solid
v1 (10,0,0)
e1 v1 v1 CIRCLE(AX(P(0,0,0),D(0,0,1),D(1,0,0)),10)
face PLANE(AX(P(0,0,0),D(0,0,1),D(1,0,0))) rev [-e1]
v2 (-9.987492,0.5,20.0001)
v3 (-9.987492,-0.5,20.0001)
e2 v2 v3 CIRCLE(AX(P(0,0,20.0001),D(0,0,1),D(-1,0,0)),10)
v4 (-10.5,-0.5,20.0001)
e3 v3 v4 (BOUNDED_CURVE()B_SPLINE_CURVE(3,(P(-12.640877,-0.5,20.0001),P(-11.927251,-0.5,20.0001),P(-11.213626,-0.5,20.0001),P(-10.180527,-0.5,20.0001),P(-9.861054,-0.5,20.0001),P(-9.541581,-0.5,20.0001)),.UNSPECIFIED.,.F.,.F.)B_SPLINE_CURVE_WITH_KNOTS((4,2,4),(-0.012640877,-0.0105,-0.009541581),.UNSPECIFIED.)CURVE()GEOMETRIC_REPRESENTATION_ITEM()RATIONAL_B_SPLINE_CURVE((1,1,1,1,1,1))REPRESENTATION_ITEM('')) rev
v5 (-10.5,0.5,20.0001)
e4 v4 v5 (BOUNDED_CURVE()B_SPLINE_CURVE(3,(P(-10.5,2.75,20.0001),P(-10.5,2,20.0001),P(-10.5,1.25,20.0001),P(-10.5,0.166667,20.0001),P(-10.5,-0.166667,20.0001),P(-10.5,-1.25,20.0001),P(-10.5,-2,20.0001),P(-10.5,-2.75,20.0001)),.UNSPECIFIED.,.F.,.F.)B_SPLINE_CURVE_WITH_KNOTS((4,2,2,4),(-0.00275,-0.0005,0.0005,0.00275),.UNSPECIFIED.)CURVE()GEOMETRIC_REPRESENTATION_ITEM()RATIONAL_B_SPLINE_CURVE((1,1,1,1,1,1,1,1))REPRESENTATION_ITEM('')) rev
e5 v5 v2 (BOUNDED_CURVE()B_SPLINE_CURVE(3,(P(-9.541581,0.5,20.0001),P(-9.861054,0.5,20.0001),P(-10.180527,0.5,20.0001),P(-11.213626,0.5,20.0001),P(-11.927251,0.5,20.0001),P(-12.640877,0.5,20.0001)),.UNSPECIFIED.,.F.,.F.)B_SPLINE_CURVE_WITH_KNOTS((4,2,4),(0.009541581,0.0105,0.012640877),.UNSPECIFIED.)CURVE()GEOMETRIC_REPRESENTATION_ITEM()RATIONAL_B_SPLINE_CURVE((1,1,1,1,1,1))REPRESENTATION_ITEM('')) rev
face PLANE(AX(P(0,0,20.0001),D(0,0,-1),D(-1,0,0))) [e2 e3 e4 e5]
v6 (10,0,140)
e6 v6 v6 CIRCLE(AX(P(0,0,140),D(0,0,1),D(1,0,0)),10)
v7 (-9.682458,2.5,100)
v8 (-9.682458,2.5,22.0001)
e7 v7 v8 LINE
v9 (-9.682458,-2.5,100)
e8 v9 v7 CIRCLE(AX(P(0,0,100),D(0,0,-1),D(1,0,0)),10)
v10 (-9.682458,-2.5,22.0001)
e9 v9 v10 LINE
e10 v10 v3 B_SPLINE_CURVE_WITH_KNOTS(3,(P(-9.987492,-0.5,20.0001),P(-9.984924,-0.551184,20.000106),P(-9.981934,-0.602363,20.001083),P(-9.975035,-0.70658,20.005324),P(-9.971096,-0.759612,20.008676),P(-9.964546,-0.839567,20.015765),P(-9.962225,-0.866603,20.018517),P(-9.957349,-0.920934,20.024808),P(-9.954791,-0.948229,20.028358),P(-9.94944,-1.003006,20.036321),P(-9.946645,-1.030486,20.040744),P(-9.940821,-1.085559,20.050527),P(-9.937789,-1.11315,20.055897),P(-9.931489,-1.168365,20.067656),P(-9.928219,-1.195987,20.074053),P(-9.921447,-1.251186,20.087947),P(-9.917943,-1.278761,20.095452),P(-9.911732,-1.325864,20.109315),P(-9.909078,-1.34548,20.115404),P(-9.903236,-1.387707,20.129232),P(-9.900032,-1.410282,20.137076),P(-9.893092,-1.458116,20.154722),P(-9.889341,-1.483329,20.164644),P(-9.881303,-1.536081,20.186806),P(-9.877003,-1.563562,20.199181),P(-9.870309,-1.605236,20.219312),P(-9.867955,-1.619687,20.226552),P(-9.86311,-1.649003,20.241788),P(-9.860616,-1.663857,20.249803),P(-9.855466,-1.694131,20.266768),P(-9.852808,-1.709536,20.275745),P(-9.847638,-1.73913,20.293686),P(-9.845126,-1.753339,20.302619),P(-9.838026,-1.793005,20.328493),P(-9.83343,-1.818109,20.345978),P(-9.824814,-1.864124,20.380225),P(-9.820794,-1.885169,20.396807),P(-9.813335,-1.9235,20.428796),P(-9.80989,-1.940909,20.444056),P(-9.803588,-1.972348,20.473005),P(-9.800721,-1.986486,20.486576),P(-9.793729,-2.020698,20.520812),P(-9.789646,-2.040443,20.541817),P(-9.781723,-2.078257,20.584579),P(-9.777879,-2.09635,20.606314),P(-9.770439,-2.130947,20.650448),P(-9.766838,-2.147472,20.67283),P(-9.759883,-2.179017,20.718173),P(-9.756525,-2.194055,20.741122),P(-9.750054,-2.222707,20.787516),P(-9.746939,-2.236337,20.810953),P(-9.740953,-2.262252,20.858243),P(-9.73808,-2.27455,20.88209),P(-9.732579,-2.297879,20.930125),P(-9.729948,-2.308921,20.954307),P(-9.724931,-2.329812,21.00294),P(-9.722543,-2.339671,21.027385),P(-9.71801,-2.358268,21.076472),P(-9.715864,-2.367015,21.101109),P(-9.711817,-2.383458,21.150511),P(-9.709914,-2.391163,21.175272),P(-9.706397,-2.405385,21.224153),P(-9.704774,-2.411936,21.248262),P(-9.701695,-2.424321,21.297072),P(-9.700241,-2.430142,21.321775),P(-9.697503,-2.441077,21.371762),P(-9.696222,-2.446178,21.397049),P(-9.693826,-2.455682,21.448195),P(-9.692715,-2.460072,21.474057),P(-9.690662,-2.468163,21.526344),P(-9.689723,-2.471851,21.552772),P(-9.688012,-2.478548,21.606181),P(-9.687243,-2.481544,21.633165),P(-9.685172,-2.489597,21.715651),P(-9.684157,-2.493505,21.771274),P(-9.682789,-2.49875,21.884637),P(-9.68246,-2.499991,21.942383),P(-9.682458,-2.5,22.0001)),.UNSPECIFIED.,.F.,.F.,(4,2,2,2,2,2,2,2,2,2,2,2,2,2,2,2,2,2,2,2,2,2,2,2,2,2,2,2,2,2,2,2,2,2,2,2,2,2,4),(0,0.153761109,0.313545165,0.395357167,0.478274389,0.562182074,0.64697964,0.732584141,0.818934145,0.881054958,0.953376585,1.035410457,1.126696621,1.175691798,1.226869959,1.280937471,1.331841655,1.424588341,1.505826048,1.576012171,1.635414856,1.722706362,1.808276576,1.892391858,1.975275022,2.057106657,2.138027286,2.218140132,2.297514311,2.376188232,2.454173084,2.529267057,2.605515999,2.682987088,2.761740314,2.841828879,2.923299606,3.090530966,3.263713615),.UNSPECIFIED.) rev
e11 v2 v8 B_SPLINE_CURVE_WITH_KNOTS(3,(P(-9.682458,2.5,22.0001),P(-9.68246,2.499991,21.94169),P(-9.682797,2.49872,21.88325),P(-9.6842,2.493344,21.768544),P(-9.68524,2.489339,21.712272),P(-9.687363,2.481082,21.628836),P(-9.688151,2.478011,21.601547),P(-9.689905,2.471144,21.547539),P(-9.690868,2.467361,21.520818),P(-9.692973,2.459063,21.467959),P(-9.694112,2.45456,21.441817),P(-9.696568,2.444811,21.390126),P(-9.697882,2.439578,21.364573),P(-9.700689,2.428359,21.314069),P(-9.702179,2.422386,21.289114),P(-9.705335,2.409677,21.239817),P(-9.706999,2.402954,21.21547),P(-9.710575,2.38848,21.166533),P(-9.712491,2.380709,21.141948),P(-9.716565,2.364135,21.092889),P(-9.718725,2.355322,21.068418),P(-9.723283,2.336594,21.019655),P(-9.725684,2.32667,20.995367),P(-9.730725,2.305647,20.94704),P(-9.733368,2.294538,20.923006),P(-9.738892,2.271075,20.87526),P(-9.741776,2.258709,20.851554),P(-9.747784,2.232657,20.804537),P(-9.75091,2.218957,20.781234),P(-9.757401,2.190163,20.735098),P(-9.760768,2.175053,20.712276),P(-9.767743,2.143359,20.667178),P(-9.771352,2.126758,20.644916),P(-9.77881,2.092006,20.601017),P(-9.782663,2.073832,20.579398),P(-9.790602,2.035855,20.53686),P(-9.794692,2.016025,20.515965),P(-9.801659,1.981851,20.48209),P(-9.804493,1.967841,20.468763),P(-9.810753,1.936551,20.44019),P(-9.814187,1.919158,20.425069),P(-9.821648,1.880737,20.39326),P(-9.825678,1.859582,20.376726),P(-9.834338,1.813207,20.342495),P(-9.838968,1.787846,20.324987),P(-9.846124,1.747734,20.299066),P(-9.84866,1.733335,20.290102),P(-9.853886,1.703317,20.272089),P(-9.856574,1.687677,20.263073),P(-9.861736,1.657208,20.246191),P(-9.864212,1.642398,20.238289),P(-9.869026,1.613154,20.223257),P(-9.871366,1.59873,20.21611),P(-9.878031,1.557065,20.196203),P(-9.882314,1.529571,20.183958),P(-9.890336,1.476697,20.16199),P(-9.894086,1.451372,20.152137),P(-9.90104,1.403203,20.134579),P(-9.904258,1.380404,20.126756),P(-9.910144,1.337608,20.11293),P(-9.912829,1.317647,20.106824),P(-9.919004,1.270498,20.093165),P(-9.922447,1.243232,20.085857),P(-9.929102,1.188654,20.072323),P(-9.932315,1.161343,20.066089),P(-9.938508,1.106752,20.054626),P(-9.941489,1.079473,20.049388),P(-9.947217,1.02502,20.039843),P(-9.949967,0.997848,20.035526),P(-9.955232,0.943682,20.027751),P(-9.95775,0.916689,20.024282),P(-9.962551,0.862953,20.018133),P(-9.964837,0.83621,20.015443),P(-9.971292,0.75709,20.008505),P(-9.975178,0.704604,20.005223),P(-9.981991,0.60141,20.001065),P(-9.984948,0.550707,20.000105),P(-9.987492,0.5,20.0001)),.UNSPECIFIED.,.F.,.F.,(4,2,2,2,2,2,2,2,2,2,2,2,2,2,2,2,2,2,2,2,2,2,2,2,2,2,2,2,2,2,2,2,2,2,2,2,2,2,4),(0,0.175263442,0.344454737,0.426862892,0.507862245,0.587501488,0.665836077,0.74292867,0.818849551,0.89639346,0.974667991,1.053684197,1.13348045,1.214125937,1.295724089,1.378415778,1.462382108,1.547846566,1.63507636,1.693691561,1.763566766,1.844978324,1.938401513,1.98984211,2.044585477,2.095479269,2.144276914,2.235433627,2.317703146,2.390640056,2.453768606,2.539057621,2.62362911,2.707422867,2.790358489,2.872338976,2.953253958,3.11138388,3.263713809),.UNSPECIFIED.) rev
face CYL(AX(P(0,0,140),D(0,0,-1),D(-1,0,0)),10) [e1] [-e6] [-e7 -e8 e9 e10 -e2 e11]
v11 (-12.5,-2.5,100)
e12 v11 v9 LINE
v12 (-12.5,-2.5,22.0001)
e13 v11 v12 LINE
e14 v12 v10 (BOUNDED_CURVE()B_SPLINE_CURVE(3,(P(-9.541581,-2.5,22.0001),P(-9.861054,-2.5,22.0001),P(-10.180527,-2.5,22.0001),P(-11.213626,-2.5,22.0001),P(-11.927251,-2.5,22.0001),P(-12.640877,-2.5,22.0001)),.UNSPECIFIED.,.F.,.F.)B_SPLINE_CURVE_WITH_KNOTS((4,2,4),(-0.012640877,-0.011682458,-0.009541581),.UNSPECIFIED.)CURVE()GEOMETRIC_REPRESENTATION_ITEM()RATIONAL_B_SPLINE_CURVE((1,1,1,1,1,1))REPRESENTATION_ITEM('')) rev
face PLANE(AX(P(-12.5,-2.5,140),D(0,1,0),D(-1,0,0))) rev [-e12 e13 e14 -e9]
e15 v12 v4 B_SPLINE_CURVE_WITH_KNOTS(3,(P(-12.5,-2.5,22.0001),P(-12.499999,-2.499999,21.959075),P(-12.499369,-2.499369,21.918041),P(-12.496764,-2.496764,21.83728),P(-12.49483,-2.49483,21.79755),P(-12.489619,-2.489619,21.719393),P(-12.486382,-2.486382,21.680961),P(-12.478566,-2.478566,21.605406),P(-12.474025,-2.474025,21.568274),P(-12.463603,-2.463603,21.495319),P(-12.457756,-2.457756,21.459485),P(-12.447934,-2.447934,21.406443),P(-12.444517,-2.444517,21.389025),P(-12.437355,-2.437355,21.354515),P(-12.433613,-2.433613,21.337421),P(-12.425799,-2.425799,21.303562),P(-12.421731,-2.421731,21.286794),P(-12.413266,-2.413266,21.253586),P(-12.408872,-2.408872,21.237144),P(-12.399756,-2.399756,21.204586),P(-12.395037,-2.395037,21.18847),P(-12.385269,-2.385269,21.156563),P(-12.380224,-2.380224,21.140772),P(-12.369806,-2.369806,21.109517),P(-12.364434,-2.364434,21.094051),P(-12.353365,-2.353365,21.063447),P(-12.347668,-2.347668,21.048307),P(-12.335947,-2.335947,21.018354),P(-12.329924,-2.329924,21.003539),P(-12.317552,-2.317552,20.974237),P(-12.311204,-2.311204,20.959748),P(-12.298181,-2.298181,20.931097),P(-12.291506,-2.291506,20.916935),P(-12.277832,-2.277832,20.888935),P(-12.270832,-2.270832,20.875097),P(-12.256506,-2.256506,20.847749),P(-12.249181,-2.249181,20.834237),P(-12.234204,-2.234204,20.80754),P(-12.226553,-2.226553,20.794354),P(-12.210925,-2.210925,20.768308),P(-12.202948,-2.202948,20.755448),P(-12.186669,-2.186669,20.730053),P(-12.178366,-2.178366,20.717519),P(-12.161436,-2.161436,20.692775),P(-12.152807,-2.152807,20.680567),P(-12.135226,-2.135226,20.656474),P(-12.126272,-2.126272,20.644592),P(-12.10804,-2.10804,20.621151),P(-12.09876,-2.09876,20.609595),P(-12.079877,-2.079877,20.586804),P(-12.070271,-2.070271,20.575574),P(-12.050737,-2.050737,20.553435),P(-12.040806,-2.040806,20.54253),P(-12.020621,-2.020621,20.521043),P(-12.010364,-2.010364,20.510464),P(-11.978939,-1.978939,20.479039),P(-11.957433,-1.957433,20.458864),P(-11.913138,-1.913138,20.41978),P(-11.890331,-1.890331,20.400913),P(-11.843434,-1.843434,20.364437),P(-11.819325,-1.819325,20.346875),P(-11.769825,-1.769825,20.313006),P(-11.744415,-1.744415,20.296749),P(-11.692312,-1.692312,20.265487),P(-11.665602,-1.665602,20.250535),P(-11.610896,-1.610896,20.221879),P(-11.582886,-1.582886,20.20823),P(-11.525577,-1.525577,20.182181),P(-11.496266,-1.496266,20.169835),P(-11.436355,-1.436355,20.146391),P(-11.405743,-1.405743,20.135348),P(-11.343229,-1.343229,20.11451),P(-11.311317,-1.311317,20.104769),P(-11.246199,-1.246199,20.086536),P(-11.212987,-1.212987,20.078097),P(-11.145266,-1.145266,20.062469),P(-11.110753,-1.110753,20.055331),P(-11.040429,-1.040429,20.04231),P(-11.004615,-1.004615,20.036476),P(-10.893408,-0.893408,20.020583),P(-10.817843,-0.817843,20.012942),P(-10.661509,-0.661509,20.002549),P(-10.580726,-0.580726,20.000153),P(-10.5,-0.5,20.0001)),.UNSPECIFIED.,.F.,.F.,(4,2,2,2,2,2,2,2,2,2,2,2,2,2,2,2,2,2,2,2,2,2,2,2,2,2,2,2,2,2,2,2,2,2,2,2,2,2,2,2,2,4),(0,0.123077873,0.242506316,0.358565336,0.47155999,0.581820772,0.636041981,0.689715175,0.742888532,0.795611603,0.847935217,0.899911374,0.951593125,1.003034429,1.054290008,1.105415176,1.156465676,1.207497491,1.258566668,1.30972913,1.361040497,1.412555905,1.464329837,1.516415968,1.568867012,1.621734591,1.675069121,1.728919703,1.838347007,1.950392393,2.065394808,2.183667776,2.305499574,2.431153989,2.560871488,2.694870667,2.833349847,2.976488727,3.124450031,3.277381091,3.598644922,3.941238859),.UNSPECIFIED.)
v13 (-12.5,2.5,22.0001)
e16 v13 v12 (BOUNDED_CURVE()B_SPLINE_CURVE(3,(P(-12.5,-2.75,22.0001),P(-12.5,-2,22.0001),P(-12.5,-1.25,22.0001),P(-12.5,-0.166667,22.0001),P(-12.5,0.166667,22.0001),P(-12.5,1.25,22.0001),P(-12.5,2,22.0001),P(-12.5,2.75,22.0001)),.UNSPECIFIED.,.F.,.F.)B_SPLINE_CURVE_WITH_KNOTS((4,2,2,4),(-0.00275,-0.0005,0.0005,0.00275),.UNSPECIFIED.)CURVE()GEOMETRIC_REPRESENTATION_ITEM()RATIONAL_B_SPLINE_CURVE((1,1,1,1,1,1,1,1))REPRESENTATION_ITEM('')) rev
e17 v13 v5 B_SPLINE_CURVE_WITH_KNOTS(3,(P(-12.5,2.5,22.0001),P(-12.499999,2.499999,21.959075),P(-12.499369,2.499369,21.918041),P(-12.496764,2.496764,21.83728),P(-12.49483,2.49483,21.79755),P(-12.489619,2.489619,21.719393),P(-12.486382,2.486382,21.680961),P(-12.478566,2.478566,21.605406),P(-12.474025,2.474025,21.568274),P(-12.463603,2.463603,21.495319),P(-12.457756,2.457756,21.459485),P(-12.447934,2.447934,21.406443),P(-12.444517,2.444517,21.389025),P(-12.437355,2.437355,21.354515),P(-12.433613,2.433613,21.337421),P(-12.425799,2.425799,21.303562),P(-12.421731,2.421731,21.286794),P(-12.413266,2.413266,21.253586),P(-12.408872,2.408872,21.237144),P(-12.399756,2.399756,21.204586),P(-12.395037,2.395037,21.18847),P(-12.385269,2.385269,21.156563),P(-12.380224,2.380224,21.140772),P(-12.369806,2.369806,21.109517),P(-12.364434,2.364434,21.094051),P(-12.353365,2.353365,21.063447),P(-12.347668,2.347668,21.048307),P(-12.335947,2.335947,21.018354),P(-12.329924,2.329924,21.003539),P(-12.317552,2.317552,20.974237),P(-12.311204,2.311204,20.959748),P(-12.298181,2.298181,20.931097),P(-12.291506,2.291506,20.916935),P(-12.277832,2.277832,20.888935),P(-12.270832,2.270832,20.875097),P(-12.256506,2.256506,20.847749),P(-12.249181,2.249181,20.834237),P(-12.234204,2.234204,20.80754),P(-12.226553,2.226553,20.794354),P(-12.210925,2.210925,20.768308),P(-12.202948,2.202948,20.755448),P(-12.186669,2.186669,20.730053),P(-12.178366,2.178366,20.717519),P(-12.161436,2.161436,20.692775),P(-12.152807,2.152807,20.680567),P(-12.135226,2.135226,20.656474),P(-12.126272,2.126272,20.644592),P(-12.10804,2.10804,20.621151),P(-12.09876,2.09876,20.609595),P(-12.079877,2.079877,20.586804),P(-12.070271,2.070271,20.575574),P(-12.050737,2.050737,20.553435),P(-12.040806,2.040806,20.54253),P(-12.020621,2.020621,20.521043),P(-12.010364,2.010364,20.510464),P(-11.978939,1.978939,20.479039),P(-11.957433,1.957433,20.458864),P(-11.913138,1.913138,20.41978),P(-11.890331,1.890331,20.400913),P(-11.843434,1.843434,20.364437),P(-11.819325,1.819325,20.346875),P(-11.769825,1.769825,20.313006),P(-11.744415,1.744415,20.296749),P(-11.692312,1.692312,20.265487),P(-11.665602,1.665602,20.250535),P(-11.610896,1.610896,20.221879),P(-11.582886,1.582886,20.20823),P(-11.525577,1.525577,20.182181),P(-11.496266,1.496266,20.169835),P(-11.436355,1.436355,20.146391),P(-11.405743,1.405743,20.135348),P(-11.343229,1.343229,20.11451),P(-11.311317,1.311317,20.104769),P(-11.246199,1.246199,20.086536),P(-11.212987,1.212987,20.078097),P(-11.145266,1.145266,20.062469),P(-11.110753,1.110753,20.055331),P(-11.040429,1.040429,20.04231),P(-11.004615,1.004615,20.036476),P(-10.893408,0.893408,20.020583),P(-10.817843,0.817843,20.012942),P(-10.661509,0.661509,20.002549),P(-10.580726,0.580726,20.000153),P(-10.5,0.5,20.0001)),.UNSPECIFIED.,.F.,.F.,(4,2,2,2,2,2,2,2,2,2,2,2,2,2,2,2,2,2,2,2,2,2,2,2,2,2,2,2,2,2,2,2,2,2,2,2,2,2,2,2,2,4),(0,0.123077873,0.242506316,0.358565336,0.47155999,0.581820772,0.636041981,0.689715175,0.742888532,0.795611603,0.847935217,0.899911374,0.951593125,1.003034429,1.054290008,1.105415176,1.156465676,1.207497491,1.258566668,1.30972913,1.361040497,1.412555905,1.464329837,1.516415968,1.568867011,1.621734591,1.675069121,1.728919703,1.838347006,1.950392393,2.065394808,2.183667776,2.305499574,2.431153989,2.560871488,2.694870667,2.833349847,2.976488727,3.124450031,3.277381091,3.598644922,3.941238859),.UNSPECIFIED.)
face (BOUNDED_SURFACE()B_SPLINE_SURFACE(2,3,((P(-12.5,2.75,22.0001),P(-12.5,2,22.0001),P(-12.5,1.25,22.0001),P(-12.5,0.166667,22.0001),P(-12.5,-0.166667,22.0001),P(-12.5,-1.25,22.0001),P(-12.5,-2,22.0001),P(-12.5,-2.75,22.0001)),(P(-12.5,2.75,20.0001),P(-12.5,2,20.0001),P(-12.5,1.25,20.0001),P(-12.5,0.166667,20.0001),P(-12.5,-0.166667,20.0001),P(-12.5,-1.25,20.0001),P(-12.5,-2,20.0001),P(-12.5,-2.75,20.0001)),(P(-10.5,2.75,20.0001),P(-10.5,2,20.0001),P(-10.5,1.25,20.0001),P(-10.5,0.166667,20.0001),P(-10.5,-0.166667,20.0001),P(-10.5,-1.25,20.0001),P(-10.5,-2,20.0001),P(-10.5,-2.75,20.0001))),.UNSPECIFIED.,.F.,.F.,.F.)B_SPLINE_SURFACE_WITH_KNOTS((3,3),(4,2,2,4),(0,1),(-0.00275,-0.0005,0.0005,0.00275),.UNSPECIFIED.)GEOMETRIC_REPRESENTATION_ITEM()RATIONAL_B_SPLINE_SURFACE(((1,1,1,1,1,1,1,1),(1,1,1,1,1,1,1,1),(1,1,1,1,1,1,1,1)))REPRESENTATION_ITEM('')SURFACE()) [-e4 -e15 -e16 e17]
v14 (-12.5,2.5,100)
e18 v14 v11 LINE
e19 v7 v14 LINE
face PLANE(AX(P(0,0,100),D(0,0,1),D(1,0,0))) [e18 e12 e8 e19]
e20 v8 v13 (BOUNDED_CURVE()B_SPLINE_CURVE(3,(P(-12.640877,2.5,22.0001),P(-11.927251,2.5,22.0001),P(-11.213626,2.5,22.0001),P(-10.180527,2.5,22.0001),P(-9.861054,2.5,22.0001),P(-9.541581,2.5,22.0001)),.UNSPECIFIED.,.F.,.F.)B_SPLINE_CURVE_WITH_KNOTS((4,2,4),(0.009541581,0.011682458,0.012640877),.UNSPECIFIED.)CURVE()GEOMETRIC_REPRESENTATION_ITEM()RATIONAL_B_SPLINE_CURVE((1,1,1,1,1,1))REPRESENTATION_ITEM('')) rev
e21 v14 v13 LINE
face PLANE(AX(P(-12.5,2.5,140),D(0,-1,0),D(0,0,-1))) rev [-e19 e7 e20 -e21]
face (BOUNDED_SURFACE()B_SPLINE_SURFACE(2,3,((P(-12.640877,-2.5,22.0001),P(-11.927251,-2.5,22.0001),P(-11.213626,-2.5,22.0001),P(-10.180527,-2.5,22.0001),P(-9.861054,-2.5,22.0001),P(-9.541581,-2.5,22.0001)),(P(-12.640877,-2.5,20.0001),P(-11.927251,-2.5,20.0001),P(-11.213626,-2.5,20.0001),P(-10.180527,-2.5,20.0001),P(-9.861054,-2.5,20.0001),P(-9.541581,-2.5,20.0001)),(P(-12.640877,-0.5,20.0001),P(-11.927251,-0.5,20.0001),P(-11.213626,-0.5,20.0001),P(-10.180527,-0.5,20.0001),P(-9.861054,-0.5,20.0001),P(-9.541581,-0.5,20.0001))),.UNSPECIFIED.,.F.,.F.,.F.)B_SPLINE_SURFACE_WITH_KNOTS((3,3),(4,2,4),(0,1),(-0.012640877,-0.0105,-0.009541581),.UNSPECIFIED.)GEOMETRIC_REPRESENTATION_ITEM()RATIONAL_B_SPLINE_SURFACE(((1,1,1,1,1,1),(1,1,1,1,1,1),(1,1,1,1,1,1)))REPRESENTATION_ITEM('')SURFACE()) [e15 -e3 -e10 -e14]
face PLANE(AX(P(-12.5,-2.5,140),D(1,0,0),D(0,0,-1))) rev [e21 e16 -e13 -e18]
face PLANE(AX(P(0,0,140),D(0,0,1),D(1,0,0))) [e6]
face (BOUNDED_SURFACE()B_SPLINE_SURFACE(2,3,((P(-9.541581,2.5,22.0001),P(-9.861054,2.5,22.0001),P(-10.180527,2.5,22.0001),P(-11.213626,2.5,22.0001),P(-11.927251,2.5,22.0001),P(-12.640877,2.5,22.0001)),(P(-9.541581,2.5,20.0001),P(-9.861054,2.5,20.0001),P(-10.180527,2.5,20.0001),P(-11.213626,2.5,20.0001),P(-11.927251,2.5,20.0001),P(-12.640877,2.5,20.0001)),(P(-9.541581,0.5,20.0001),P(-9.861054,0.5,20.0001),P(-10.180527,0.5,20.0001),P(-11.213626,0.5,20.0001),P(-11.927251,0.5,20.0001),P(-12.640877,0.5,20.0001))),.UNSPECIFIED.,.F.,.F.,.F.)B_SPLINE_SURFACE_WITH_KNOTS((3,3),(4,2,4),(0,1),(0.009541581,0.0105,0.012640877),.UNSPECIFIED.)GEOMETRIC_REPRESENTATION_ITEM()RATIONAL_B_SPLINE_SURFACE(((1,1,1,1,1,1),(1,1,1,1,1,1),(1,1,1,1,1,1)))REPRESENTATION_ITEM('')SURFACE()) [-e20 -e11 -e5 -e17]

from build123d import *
from build123d.topology import SkipClean

# Parameters (mm, degrees)
BOSS_EXTRUDE1_DEPTH = 140
CUT_EXTRUDE1_DEPTH  = 20
CUT_EXTRUDE2_START  = -40
CUT_EXTRUDE2_DEPTH  = 40
CUT_EXTRUDE4_DEPTH  = 0.0001
FILLET2_SIZE        = 2


with BuildPart() as part:
    # Sketch1 → Boss-Extrude1 (new body)
    with BuildSketch(Plane(origin=(0, 0, 0), x_dir=(0, 1, 0), z_dir=(0, 0, 1))):
        with BuildLine():
            Line((-2.5, 12.5), (2.5, 12.5))
            Line((2.5, 12.5), (2.5, 9.682458))
            ThreePointArc((2.5, 9.682458), (0, -10), (-2.5, 9.682458))
            Line((-2.5, 9.682458), (-2.5, 12.5))
        make_face()
    extrude(amount=BOSS_EXTRUDE1_DEPTH)

    # Sketch2 → Cut-Extrude1 (cut)
    with SkipClean():  # the faces are left unmerged after this step: merging them gives an invalid solid
        with BuildSketch(Plane(origin=(0, 0, 0), x_dir=(1, 0, 0), z_dir=(0, 0, -1))):
            with BuildLine():
                Line((-9.682458, 2.5), (-12.5, 2.5))
                Line((-12.5, 2.5), (-12.5, -2.5))
                Line((-12.5, -2.5), (-9.682458, -2.5))
                ThreePointArc((-9.682458, -2.5), (-10, 0), (-9.682458, 2.5))
            make_face()
        extrude(amount=-CUT_EXTRUDE1_DEPTH, mode=Mode.SUBTRACT)

    # Sketch3 → Cut-Extrude2 (cut)
    with SkipClean():  # the faces are left unmerged after this step: merging them gives an invalid solid
        with BuildSketch(Plane.XY.offset(140).offset(CUT_EXTRUDE2_START)):
            with BuildLine():
                Line((-9.682458, 2.5), (-12.5, 2.5))
                Line((-12.5, 2.5), (-12.5, -2.5))
                Line((-12.5, -2.5), (-9.682458, -2.5))
                ThreePointArc((-9.682458, -2.5), (-10, 0), (-9.682458, 2.5))
            make_face()
        extrude(amount=CUT_EXTRUDE2_DEPTH, mode=Mode.SUBTRACT)

    # Sketch4 → Cut-Extrude4 (cut)
    with SkipClean():  # the faces are left unmerged after this step: merging them gives an invalid solid
        with BuildSketch(Plane(origin=(0, 0, 20), x_dir=(1, 0, 0), z_dir=(0, 0, -1))):
            with BuildLine():
                Line((-9.682458, 2.5), (-12.5, 2.5))
                Line((-12.5, 2.5), (-12.5, -2.5))
                Line((-12.5, -2.5), (-9.682458, -2.5))
                ThreePointArc((-9.682458, -2.5), (-10, 0), (-9.682458, 2.5))
            make_face()
        extrude(amount=-CUT_EXTRUDE4_DEPTH, mode=Mode.SUBTRACT)

    # Fillet2
    # a fillet whose section is not a circle: 2 mm, written as the material it takes off along each edge
    with BuildSketch(Plane(origin=(-4.682458, -2.5, 20.0001), x_dir=(0, 0, 1), z_dir=(-1, 0, 0))) as fillet2_piece_1_section:
        with BuildLine():
            Bezier((FILLET2_SIZE, 0), (0, 0), (0, FILLET2_SIZE), weights=[1, 1, 1])
            Line((0, FILLET2_SIZE), (0, 0))
            Line((0, 0), (FILLET2_SIZE, 0))
        make_face()
    fillet2_piece_1 = extrude(amount=12.817542, mode=Mode.PRIVATE)
    fillet2_piece_1 = fillet2_piece_1 - Plane(origin=(0, 0, 20.0001), x_dir=(-0.9682458365518543, 0.2500000000000001, 0), z_dir=(0, 0, -1)) * Cylinder(10, 34, mode=Mode.PRIVATE)
    add(fillet2_piece_1, mode=Mode.SUBTRACT)
    with BuildSketch(Plane(origin=(-17.5, 2.5, 20.0001), x_dir=(0, -1, 0), z_dir=(1, 0, 0))) as fillet2_piece_2_section:
        with BuildLine():
            Bezier((FILLET2_SIZE, 0), (0, 0), (0, -FILLET2_SIZE), weights=[1, 1, 1])
            Line((0, -FILLET2_SIZE), (0, 0))
            Line((0, 0), (FILLET2_SIZE, 0))
        make_face()
    fillet2_piece_2 = extrude(amount=12.817542, mode=Mode.PRIVATE)
    fillet2_piece_2 = fillet2_piece_2 - Plane(origin=(0, 0, 20.0001), x_dir=(-0.9682458365518561, 0.24999999999999276, 0), z_dir=(0, 0, -1)) * Cylinder(10, 34, mode=Mode.PRIVATE)
    add(fillet2_piece_2, mode=Mode.SUBTRACT)
    with BuildSketch(Plane(origin=(-12.5, -7.5, 20.0001), x_dir=(1, 0, 0), z_dir=(0, 1, 0))) as fillet2_piece_3:
        with BuildLine():
            Bezier((FILLET2_SIZE, 0), (0, 0), (0, -FILLET2_SIZE), weights=[1, 1, 1])
            Line((0, -FILLET2_SIZE), (0, 0))
            Line((0, 0), (FILLET2_SIZE, 0))
        make_face()
    extrude(amount=15, mode=Mode.SUBTRACT)


solid = part.part
